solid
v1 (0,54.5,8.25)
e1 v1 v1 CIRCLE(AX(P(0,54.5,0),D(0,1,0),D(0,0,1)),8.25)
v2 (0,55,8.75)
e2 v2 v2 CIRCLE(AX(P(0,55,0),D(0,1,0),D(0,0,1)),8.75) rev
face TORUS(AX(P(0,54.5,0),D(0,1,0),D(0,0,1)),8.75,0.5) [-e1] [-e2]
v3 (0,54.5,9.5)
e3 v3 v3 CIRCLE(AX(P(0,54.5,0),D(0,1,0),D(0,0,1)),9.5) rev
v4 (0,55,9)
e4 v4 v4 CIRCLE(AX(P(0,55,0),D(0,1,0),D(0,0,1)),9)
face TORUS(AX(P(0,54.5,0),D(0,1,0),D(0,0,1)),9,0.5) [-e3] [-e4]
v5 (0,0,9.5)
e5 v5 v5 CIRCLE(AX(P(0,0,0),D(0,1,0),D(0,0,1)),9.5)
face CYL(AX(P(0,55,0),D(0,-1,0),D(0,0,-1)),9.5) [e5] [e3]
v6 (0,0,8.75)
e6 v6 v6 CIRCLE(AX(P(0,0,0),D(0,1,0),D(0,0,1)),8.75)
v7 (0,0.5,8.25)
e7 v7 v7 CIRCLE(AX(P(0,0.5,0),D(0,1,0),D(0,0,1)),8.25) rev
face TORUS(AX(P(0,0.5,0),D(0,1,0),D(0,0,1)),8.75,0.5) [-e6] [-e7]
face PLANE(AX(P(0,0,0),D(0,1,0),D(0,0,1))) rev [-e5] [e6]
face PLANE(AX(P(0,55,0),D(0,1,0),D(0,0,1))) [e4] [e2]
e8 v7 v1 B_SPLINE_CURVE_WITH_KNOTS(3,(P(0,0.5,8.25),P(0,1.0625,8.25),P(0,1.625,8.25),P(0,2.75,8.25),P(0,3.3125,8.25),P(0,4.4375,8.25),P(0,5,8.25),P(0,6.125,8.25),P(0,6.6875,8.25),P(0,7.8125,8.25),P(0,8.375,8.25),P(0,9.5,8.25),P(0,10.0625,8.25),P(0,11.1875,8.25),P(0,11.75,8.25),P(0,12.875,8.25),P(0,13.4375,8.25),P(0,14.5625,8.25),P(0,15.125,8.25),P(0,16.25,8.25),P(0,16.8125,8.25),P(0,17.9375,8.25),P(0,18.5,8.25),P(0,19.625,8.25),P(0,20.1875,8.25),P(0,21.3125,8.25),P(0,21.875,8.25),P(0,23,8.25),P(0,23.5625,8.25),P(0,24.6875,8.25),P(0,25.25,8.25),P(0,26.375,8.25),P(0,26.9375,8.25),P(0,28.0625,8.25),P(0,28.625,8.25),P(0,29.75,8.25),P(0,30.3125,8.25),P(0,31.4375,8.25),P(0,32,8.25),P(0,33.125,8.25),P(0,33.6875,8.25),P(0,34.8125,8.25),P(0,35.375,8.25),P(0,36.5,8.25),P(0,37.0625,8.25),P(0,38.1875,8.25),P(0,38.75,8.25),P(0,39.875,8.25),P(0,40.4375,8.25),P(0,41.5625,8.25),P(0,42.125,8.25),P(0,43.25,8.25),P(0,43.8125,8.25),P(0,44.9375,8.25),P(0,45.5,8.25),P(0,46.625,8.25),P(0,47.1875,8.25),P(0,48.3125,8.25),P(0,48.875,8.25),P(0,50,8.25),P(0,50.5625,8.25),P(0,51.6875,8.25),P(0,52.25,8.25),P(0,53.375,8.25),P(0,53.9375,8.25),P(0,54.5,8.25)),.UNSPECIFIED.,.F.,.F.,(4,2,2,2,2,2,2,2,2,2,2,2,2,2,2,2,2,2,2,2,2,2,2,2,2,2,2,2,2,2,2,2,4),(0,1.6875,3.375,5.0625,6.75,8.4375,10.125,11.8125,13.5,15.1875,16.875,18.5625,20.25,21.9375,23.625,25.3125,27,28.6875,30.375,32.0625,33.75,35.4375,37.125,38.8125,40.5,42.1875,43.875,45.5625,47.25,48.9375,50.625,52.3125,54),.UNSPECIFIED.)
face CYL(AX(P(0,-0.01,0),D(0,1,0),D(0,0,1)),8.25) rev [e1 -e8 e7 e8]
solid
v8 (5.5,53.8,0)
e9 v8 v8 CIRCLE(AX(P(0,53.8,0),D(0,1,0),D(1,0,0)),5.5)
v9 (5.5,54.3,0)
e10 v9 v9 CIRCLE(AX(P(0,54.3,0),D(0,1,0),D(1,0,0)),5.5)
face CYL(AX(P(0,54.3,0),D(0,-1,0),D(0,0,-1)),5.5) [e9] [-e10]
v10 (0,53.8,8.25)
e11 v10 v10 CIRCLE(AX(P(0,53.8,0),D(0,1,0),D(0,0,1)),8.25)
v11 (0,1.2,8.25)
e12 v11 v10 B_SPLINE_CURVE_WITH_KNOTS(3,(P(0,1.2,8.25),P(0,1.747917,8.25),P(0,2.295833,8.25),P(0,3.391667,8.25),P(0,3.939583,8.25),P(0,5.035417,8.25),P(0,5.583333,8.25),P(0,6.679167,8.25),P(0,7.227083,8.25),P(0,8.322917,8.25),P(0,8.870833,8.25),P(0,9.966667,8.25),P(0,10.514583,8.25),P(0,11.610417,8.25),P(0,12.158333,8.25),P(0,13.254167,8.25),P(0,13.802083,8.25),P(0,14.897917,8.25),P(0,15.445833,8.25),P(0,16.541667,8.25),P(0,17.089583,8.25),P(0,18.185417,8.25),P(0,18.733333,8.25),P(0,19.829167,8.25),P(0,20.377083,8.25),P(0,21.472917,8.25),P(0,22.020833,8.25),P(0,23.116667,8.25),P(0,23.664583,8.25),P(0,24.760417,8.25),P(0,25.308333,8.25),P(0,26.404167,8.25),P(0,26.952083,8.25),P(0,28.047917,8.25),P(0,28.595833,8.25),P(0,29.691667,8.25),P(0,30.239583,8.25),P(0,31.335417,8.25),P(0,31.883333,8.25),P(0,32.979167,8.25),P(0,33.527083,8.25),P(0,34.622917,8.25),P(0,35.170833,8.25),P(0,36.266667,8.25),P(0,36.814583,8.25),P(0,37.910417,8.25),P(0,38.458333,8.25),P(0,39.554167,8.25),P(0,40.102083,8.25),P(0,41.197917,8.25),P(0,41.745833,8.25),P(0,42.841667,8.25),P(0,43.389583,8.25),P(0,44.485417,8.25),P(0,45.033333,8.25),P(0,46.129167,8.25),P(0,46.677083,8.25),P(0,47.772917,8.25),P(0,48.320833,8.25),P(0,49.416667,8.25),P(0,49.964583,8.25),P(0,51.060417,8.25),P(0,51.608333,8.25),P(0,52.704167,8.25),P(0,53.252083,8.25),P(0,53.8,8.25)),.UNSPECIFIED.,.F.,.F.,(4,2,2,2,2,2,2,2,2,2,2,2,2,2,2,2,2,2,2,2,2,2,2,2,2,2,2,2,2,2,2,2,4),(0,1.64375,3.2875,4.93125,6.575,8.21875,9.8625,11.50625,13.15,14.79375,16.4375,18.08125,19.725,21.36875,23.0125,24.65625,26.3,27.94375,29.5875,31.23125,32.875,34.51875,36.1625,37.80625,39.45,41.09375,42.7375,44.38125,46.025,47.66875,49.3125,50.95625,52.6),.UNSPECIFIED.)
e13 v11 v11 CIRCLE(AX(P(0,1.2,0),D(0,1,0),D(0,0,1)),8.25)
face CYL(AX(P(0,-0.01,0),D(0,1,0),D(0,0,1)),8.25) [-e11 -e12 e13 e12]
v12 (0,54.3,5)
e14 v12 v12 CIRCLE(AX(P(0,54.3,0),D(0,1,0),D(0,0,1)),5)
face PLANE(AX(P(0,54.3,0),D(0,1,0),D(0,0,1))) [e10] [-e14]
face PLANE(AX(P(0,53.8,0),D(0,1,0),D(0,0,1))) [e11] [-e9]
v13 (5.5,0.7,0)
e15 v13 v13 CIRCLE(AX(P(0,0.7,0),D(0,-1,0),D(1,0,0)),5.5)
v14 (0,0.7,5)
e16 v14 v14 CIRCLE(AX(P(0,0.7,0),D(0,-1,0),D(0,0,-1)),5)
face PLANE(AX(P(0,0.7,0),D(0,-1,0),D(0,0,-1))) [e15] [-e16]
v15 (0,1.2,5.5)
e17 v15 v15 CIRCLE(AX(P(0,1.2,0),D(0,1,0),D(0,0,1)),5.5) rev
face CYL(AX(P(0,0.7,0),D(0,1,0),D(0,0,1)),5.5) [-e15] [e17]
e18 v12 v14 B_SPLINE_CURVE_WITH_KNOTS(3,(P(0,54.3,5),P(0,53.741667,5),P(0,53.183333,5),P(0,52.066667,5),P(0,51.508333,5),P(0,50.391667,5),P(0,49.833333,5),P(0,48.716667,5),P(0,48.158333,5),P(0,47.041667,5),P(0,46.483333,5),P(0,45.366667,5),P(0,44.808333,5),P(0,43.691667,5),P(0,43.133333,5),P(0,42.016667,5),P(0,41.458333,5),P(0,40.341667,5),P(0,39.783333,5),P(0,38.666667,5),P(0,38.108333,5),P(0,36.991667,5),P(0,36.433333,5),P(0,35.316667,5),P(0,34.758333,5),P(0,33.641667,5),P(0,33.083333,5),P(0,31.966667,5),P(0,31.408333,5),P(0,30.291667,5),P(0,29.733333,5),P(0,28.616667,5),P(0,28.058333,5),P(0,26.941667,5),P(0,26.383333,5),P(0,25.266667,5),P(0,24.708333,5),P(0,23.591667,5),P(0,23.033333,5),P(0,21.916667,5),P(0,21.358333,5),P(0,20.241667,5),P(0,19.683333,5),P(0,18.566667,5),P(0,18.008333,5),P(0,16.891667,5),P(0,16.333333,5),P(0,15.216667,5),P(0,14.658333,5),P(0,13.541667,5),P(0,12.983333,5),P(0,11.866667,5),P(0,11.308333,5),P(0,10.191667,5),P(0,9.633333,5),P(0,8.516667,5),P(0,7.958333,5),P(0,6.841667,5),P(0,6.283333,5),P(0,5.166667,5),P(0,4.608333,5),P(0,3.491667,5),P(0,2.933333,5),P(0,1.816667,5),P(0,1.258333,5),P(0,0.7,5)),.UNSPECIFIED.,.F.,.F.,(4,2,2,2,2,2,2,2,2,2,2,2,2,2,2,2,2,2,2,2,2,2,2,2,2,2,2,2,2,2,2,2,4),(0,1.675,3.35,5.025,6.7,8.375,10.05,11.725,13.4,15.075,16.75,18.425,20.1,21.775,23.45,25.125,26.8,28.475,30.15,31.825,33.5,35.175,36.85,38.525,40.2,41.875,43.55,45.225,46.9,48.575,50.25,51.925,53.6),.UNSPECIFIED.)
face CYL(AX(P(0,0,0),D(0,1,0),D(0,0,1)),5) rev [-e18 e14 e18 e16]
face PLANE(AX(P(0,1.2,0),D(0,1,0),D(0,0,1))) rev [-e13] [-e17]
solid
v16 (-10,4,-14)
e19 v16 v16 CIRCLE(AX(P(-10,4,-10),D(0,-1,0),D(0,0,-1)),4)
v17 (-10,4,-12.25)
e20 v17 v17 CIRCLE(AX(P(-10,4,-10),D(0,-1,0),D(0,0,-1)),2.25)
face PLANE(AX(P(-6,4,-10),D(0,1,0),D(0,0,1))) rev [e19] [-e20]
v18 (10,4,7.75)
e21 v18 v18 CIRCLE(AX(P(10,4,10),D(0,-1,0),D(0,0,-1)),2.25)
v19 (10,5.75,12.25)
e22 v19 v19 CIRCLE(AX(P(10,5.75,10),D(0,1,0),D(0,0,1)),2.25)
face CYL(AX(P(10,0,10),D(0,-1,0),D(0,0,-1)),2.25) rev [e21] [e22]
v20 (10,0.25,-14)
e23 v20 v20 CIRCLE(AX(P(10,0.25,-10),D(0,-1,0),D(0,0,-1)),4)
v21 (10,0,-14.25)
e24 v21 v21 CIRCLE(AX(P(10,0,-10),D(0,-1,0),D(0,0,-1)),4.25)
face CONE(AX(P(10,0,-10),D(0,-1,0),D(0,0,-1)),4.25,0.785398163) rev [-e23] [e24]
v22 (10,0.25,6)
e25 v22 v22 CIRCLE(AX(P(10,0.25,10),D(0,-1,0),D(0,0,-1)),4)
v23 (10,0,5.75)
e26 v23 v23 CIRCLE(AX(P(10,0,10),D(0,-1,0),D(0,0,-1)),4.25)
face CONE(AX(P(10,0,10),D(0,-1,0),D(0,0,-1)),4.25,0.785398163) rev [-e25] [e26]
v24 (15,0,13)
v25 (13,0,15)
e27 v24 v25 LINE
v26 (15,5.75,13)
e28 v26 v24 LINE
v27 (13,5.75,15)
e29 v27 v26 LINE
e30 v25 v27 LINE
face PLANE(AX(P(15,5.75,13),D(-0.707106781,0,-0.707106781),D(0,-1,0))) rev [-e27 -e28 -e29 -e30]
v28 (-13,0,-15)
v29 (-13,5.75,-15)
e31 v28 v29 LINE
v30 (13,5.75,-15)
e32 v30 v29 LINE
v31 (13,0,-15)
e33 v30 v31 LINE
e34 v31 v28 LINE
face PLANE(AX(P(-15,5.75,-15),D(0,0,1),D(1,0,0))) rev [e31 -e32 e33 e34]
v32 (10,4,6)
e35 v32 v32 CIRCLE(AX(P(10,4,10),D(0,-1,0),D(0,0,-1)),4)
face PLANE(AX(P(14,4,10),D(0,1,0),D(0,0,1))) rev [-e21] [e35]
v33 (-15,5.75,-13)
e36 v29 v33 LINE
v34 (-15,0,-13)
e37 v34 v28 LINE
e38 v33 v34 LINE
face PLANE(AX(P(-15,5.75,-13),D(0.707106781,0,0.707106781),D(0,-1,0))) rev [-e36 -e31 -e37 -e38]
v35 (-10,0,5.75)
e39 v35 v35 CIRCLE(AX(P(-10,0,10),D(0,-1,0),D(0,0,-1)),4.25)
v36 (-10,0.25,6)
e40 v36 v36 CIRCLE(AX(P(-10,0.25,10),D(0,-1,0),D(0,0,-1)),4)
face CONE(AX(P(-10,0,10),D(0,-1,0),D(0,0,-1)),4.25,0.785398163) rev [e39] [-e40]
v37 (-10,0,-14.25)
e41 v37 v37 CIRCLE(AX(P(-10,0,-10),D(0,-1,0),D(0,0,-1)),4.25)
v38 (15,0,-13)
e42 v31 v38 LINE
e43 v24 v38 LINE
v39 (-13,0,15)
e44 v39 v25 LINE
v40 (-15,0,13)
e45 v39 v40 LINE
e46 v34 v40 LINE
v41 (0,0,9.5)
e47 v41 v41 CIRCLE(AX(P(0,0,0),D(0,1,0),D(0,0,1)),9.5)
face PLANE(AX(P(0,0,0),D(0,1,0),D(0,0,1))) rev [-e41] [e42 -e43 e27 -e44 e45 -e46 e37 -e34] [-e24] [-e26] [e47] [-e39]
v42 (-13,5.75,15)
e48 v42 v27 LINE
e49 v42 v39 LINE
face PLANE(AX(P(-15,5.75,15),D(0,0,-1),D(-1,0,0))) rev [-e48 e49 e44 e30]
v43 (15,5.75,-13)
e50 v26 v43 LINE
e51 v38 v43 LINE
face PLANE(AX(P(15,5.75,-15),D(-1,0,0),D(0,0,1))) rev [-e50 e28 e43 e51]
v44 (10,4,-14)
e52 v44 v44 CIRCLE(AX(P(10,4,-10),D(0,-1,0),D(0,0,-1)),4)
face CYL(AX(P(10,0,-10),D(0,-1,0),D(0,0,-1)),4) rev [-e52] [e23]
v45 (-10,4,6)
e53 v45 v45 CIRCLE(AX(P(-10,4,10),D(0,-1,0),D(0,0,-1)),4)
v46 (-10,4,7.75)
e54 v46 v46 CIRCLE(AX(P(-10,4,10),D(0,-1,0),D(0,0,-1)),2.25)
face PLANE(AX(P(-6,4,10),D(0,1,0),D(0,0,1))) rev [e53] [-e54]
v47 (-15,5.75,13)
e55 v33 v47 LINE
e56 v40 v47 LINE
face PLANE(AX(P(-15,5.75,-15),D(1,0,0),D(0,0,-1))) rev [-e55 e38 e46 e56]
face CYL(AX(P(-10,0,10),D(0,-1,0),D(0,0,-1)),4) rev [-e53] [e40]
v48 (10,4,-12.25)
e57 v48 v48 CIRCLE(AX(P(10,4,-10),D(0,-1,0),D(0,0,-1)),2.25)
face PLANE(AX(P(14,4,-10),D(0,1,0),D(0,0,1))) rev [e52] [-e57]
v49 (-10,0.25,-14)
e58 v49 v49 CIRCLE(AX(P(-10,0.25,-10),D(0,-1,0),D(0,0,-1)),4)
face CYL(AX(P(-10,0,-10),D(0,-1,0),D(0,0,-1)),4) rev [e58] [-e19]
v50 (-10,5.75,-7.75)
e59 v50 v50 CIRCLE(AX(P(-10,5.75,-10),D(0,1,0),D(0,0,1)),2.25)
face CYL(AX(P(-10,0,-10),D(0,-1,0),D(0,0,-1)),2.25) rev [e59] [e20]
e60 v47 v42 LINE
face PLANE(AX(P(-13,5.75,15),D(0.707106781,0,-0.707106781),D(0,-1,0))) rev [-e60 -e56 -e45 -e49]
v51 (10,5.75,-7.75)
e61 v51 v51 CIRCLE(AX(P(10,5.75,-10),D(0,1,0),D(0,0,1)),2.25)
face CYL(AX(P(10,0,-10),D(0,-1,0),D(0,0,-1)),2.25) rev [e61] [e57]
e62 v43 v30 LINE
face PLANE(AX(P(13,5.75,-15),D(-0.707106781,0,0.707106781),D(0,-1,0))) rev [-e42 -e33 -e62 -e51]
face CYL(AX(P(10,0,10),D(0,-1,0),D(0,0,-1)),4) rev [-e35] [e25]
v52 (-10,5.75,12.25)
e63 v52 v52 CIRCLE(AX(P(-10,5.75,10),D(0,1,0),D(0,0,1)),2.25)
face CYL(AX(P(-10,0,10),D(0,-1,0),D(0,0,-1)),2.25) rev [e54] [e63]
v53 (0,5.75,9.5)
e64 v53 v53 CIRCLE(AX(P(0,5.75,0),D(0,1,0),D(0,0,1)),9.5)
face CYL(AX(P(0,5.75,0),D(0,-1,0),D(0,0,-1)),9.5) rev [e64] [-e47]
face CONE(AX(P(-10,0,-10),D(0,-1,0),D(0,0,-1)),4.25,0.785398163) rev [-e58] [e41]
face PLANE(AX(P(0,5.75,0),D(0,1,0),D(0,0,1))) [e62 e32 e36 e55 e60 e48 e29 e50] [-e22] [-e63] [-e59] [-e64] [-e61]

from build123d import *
from build123d.topology import SkipClean

# Parameters (mm, degrees)
SKETCH1_W                     = 30
SKETCH1_H                     = 30
SKETCH1_R                     = 9.5
BOSS_EXTRUDE1_DEPTH           = 5.75
SKETCH1_2_R                   = 9.5
BOSS_EXTRUDE3_DEPTH           = 55
SPLIT1_OUTLINE_R              = 9.5
SPLIT1_OUTLINE_R_2            = 8.25
SPLIT1_DEPTH                  = 55
SPLIT1_2_OUTLINE_R            = 9.5
SPLIT1_2_OUTLINE_R_2          = 8.25
SPLIT1_2_DEPTH                = 55
MOVE_START                    = 53.8
MOVE_FACE1_OUTLINE_R          = 8.25
MOVE_FACE1_DEPTH              = 1.2
MOVE_FACE2_OUTLINE_R          = 8.25
MOVE_FACE2_DEPTH              = 1.2
SKETCH5_R                     = 5
CUT_EXTRUDE1_DEPTH            = 58.831133484
SKETCH6_R                     = 5.5
SKETCH6_R_2                   = 5
EXTRUDE_THIN1_DEPTH           = 0.5
SKETCH7_R                     = 5.5
SKETCH7_R_2                   = 5
EXTRUDE_THIN2_DEPTH           = 0.5
FILLET1_R                     = 0.5
CBORE_FOR_M4_SHCS1_AT_2_COUNT = 2
CBORE_FOR_M4_SHCS1_AT_2_PITCH = 20
CBORE_FOR_M4_SHCS1_AT_3_COUNT = 2
CBORE_FOR_M4_SHCS1_AT_3_PITCH = 28.284271247
CBORE_FOR_M4_SHCS1_AT_4_COUNT = 2
CBORE_FOR_M4_SHCS1_AT_4_PITCH = 20
CHAMFER1_SIZE                 = 2


# Read off the part's stored shape, not the designer's step: Split1, Move Face1, Move Face2
with BuildPart() as part:
    # Sketch1 → Boss-Extrude1 (new body)
    with BuildSketch(Plane(origin=(0, 0, 0), x_dir=(1, 0, 0), z_dir=(0, 1, 0))):
        Rectangle(SKETCH1_W, SKETCH1_H)
        with Locations(Location((0, 0, 0), (0, 0, 270))):
            Circle(SKETCH1_R, mode=Mode.SUBTRACT)
    extrude(amount=BOSS_EXTRUDE1_DEPTH)

    # Sketch10 → CBORE for M4 SHCS1 (revolve, cut)
    with BuildSketch(Plane(origin=(10, 0, 10), x_dir=(0, 0, -1), z_dir=(1, 0, 0))):
        Polygon((0, 0), (0, 5.751), (2.25, 5.751), (2.25, 4), (4, 4), (4, 0.25), (4.25, 0), align=None)
    cbore_for_m4_shcs1 = revolve(axis=Axis((10, -6.35, 10), (0, 1, 0)), mode=Mode.SUBTRACT)

    # CBORE for M4 SHCS1 at 2: CBORE for M4 SHCS1 ×2
    with Locations(*[(0, 0, -i * CBORE_FOR_M4_SHCS1_AT_2_PITCH) for i in range(1, CBORE_FOR_M4_SHCS1_AT_2_COUNT)]):
        add(cbore_for_m4_shcs1, mode=Mode.SUBTRACT)

    # CBORE for M4 SHCS1 at 3: CBORE for M4 SHCS1 ×2
    with Locations(*[Vector(-0.7071067811865476, 0, -0.7071067811865476) * (i * CBORE_FOR_M4_SHCS1_AT_3_PITCH) for i in range(1, CBORE_FOR_M4_SHCS1_AT_3_COUNT)]):
        add(cbore_for_m4_shcs1, mode=Mode.SUBTRACT)

    # CBORE for M4 SHCS1 at 4: CBORE for M4 SHCS1 ×2
    with Locations(*[(-i * CBORE_FOR_M4_SHCS1_AT_4_PITCH, 0, 0) for i in range(1, CBORE_FOR_M4_SHCS1_AT_4_COUNT)]):
        add(cbore_for_m4_shcs1, mode=Mode.SUBTRACT)

    # Chamfer1
    chamfer1_edges = [part.edges().sort_by_distance(p)[0] for p in [
        (15, 2.875, 15),
        (-15, 2.875, 15),
        (-15, 2.875, -15),
        (15, 2.875, -15),
    ]]
    chamfer(chamfer1_edges, length=CHAMFER1_SIZE)


with BuildPart() as body_2:
    # Sketch1<2> → Boss-Extrude3 (new body)
    with BuildSketch(Plane(origin=(0, 0, 0), x_dir=(1, 0, 0), z_dir=(0, 1, 0))):
        with Locations(Location((0, 0, 0), (0, 0, 270))):
            Circle(SKETCH1_2_R)
    extrude(amount=BOSS_EXTRUDE3_DEPTH)

    # Split1 outline → Split1 (cut)
    with BuildSketch(Plane(origin=(0, 0, 0), x_dir=(1, 0, 0), z_dir=(0, 1, 0))):
        Circle(SPLIT1_OUTLINE_R)
        Circle(SPLIT1_OUTLINE_R_2, mode=Mode.SUBTRACT)
    extrude(amount=SPLIT1_DEPTH, mode=Mode.SUBTRACT)

    # Move Face1 outline → Move Face1 (cut)
    with BuildSketch(Plane(origin=(0, 0, 0), x_dir=(1, 0, 0), z_dir=(0, 1, 0)).offset(MOVE_START)):
        Circle(MOVE_FACE1_OUTLINE_R)
    extrude(amount=MOVE_FACE1_DEPTH, mode=Mode.SUBTRACT)

    # Move Face2 outline → Move Face2 (cut)
    with BuildSketch(Plane(origin=(0, 0, 0), x_dir=(1, 0, 0), z_dir=(0, 1, 0))):
        Circle(MOVE_FACE2_OUTLINE_R)
    extrude(amount=MOVE_FACE2_DEPTH, mode=Mode.SUBTRACT)

    # Sketch5 → Cut-Extrude1 (cut, through all)
    with BuildSketch(Plane(origin=(0, 53.8, 0), x_dir=(1, 0, 0), z_dir=(0, 1, 0))):
        with Locations(Location((0, 0, 0), (0, 0, 270))):
            Circle(SKETCH5_R)
    extrude(amount=-CUT_EXTRUDE1_DEPTH, mode=Mode.SUBTRACT)

    # Sketch6 → Extrude-Thin1 (add)
    with SkipClean():  # the faces are left unmerged after this step: merging them gives an invalid solid
        with BuildSketch(Plane(origin=(0, 53.8, 0), x_dir=(1, 0, 0), z_dir=(0, 1, 0))):
            Circle(SKETCH6_R)
            Circle(SKETCH6_R_2, mode=Mode.SUBTRACT)
        extrude(amount=EXTRUDE_THIN1_DEPTH)
    add(body_2.part.scale(1), mode=Mode.REPLACE)  # the faces are merged on a copy

    # Sketch7 → Extrude-Thin2 (add)
    with SkipClean():  # the faces are left unmerged after this step: merging them gives an invalid solid
        with BuildSketch(Plane.XZ.offset(-1.2)):
            Circle(SKETCH7_R)
            Circle(SKETCH7_R_2, mode=Mode.SUBTRACT)
        extrude(amount=EXTRUDE_THIN2_DEPTH)


with BuildPart() as body_3:
    # Split1 2 outline → Split1 2 (new body)
    with BuildSketch(Plane(origin=(0, 0, 0), x_dir=(1, 0, 0), z_dir=(0, 1, 0))):
        Circle(SPLIT1_2_OUTLINE_R)
        Circle(SPLIT1_2_OUTLINE_R_2, mode=Mode.SUBTRACT)
    extrude(amount=SPLIT1_2_DEPTH)

    # Fillet1
    fillet1_edges = [body_3.edges().sort_by_distance(p)[0] for p in [
        (-8.25, 55, 0),
        (-9.5, 55, 0),
        (-8.25, 0, 0),
    ]]
    fillet(fillet1_edges, radius=FILLET1_R)


solid = Compound([part.part, body_2.part, body_3.part])
